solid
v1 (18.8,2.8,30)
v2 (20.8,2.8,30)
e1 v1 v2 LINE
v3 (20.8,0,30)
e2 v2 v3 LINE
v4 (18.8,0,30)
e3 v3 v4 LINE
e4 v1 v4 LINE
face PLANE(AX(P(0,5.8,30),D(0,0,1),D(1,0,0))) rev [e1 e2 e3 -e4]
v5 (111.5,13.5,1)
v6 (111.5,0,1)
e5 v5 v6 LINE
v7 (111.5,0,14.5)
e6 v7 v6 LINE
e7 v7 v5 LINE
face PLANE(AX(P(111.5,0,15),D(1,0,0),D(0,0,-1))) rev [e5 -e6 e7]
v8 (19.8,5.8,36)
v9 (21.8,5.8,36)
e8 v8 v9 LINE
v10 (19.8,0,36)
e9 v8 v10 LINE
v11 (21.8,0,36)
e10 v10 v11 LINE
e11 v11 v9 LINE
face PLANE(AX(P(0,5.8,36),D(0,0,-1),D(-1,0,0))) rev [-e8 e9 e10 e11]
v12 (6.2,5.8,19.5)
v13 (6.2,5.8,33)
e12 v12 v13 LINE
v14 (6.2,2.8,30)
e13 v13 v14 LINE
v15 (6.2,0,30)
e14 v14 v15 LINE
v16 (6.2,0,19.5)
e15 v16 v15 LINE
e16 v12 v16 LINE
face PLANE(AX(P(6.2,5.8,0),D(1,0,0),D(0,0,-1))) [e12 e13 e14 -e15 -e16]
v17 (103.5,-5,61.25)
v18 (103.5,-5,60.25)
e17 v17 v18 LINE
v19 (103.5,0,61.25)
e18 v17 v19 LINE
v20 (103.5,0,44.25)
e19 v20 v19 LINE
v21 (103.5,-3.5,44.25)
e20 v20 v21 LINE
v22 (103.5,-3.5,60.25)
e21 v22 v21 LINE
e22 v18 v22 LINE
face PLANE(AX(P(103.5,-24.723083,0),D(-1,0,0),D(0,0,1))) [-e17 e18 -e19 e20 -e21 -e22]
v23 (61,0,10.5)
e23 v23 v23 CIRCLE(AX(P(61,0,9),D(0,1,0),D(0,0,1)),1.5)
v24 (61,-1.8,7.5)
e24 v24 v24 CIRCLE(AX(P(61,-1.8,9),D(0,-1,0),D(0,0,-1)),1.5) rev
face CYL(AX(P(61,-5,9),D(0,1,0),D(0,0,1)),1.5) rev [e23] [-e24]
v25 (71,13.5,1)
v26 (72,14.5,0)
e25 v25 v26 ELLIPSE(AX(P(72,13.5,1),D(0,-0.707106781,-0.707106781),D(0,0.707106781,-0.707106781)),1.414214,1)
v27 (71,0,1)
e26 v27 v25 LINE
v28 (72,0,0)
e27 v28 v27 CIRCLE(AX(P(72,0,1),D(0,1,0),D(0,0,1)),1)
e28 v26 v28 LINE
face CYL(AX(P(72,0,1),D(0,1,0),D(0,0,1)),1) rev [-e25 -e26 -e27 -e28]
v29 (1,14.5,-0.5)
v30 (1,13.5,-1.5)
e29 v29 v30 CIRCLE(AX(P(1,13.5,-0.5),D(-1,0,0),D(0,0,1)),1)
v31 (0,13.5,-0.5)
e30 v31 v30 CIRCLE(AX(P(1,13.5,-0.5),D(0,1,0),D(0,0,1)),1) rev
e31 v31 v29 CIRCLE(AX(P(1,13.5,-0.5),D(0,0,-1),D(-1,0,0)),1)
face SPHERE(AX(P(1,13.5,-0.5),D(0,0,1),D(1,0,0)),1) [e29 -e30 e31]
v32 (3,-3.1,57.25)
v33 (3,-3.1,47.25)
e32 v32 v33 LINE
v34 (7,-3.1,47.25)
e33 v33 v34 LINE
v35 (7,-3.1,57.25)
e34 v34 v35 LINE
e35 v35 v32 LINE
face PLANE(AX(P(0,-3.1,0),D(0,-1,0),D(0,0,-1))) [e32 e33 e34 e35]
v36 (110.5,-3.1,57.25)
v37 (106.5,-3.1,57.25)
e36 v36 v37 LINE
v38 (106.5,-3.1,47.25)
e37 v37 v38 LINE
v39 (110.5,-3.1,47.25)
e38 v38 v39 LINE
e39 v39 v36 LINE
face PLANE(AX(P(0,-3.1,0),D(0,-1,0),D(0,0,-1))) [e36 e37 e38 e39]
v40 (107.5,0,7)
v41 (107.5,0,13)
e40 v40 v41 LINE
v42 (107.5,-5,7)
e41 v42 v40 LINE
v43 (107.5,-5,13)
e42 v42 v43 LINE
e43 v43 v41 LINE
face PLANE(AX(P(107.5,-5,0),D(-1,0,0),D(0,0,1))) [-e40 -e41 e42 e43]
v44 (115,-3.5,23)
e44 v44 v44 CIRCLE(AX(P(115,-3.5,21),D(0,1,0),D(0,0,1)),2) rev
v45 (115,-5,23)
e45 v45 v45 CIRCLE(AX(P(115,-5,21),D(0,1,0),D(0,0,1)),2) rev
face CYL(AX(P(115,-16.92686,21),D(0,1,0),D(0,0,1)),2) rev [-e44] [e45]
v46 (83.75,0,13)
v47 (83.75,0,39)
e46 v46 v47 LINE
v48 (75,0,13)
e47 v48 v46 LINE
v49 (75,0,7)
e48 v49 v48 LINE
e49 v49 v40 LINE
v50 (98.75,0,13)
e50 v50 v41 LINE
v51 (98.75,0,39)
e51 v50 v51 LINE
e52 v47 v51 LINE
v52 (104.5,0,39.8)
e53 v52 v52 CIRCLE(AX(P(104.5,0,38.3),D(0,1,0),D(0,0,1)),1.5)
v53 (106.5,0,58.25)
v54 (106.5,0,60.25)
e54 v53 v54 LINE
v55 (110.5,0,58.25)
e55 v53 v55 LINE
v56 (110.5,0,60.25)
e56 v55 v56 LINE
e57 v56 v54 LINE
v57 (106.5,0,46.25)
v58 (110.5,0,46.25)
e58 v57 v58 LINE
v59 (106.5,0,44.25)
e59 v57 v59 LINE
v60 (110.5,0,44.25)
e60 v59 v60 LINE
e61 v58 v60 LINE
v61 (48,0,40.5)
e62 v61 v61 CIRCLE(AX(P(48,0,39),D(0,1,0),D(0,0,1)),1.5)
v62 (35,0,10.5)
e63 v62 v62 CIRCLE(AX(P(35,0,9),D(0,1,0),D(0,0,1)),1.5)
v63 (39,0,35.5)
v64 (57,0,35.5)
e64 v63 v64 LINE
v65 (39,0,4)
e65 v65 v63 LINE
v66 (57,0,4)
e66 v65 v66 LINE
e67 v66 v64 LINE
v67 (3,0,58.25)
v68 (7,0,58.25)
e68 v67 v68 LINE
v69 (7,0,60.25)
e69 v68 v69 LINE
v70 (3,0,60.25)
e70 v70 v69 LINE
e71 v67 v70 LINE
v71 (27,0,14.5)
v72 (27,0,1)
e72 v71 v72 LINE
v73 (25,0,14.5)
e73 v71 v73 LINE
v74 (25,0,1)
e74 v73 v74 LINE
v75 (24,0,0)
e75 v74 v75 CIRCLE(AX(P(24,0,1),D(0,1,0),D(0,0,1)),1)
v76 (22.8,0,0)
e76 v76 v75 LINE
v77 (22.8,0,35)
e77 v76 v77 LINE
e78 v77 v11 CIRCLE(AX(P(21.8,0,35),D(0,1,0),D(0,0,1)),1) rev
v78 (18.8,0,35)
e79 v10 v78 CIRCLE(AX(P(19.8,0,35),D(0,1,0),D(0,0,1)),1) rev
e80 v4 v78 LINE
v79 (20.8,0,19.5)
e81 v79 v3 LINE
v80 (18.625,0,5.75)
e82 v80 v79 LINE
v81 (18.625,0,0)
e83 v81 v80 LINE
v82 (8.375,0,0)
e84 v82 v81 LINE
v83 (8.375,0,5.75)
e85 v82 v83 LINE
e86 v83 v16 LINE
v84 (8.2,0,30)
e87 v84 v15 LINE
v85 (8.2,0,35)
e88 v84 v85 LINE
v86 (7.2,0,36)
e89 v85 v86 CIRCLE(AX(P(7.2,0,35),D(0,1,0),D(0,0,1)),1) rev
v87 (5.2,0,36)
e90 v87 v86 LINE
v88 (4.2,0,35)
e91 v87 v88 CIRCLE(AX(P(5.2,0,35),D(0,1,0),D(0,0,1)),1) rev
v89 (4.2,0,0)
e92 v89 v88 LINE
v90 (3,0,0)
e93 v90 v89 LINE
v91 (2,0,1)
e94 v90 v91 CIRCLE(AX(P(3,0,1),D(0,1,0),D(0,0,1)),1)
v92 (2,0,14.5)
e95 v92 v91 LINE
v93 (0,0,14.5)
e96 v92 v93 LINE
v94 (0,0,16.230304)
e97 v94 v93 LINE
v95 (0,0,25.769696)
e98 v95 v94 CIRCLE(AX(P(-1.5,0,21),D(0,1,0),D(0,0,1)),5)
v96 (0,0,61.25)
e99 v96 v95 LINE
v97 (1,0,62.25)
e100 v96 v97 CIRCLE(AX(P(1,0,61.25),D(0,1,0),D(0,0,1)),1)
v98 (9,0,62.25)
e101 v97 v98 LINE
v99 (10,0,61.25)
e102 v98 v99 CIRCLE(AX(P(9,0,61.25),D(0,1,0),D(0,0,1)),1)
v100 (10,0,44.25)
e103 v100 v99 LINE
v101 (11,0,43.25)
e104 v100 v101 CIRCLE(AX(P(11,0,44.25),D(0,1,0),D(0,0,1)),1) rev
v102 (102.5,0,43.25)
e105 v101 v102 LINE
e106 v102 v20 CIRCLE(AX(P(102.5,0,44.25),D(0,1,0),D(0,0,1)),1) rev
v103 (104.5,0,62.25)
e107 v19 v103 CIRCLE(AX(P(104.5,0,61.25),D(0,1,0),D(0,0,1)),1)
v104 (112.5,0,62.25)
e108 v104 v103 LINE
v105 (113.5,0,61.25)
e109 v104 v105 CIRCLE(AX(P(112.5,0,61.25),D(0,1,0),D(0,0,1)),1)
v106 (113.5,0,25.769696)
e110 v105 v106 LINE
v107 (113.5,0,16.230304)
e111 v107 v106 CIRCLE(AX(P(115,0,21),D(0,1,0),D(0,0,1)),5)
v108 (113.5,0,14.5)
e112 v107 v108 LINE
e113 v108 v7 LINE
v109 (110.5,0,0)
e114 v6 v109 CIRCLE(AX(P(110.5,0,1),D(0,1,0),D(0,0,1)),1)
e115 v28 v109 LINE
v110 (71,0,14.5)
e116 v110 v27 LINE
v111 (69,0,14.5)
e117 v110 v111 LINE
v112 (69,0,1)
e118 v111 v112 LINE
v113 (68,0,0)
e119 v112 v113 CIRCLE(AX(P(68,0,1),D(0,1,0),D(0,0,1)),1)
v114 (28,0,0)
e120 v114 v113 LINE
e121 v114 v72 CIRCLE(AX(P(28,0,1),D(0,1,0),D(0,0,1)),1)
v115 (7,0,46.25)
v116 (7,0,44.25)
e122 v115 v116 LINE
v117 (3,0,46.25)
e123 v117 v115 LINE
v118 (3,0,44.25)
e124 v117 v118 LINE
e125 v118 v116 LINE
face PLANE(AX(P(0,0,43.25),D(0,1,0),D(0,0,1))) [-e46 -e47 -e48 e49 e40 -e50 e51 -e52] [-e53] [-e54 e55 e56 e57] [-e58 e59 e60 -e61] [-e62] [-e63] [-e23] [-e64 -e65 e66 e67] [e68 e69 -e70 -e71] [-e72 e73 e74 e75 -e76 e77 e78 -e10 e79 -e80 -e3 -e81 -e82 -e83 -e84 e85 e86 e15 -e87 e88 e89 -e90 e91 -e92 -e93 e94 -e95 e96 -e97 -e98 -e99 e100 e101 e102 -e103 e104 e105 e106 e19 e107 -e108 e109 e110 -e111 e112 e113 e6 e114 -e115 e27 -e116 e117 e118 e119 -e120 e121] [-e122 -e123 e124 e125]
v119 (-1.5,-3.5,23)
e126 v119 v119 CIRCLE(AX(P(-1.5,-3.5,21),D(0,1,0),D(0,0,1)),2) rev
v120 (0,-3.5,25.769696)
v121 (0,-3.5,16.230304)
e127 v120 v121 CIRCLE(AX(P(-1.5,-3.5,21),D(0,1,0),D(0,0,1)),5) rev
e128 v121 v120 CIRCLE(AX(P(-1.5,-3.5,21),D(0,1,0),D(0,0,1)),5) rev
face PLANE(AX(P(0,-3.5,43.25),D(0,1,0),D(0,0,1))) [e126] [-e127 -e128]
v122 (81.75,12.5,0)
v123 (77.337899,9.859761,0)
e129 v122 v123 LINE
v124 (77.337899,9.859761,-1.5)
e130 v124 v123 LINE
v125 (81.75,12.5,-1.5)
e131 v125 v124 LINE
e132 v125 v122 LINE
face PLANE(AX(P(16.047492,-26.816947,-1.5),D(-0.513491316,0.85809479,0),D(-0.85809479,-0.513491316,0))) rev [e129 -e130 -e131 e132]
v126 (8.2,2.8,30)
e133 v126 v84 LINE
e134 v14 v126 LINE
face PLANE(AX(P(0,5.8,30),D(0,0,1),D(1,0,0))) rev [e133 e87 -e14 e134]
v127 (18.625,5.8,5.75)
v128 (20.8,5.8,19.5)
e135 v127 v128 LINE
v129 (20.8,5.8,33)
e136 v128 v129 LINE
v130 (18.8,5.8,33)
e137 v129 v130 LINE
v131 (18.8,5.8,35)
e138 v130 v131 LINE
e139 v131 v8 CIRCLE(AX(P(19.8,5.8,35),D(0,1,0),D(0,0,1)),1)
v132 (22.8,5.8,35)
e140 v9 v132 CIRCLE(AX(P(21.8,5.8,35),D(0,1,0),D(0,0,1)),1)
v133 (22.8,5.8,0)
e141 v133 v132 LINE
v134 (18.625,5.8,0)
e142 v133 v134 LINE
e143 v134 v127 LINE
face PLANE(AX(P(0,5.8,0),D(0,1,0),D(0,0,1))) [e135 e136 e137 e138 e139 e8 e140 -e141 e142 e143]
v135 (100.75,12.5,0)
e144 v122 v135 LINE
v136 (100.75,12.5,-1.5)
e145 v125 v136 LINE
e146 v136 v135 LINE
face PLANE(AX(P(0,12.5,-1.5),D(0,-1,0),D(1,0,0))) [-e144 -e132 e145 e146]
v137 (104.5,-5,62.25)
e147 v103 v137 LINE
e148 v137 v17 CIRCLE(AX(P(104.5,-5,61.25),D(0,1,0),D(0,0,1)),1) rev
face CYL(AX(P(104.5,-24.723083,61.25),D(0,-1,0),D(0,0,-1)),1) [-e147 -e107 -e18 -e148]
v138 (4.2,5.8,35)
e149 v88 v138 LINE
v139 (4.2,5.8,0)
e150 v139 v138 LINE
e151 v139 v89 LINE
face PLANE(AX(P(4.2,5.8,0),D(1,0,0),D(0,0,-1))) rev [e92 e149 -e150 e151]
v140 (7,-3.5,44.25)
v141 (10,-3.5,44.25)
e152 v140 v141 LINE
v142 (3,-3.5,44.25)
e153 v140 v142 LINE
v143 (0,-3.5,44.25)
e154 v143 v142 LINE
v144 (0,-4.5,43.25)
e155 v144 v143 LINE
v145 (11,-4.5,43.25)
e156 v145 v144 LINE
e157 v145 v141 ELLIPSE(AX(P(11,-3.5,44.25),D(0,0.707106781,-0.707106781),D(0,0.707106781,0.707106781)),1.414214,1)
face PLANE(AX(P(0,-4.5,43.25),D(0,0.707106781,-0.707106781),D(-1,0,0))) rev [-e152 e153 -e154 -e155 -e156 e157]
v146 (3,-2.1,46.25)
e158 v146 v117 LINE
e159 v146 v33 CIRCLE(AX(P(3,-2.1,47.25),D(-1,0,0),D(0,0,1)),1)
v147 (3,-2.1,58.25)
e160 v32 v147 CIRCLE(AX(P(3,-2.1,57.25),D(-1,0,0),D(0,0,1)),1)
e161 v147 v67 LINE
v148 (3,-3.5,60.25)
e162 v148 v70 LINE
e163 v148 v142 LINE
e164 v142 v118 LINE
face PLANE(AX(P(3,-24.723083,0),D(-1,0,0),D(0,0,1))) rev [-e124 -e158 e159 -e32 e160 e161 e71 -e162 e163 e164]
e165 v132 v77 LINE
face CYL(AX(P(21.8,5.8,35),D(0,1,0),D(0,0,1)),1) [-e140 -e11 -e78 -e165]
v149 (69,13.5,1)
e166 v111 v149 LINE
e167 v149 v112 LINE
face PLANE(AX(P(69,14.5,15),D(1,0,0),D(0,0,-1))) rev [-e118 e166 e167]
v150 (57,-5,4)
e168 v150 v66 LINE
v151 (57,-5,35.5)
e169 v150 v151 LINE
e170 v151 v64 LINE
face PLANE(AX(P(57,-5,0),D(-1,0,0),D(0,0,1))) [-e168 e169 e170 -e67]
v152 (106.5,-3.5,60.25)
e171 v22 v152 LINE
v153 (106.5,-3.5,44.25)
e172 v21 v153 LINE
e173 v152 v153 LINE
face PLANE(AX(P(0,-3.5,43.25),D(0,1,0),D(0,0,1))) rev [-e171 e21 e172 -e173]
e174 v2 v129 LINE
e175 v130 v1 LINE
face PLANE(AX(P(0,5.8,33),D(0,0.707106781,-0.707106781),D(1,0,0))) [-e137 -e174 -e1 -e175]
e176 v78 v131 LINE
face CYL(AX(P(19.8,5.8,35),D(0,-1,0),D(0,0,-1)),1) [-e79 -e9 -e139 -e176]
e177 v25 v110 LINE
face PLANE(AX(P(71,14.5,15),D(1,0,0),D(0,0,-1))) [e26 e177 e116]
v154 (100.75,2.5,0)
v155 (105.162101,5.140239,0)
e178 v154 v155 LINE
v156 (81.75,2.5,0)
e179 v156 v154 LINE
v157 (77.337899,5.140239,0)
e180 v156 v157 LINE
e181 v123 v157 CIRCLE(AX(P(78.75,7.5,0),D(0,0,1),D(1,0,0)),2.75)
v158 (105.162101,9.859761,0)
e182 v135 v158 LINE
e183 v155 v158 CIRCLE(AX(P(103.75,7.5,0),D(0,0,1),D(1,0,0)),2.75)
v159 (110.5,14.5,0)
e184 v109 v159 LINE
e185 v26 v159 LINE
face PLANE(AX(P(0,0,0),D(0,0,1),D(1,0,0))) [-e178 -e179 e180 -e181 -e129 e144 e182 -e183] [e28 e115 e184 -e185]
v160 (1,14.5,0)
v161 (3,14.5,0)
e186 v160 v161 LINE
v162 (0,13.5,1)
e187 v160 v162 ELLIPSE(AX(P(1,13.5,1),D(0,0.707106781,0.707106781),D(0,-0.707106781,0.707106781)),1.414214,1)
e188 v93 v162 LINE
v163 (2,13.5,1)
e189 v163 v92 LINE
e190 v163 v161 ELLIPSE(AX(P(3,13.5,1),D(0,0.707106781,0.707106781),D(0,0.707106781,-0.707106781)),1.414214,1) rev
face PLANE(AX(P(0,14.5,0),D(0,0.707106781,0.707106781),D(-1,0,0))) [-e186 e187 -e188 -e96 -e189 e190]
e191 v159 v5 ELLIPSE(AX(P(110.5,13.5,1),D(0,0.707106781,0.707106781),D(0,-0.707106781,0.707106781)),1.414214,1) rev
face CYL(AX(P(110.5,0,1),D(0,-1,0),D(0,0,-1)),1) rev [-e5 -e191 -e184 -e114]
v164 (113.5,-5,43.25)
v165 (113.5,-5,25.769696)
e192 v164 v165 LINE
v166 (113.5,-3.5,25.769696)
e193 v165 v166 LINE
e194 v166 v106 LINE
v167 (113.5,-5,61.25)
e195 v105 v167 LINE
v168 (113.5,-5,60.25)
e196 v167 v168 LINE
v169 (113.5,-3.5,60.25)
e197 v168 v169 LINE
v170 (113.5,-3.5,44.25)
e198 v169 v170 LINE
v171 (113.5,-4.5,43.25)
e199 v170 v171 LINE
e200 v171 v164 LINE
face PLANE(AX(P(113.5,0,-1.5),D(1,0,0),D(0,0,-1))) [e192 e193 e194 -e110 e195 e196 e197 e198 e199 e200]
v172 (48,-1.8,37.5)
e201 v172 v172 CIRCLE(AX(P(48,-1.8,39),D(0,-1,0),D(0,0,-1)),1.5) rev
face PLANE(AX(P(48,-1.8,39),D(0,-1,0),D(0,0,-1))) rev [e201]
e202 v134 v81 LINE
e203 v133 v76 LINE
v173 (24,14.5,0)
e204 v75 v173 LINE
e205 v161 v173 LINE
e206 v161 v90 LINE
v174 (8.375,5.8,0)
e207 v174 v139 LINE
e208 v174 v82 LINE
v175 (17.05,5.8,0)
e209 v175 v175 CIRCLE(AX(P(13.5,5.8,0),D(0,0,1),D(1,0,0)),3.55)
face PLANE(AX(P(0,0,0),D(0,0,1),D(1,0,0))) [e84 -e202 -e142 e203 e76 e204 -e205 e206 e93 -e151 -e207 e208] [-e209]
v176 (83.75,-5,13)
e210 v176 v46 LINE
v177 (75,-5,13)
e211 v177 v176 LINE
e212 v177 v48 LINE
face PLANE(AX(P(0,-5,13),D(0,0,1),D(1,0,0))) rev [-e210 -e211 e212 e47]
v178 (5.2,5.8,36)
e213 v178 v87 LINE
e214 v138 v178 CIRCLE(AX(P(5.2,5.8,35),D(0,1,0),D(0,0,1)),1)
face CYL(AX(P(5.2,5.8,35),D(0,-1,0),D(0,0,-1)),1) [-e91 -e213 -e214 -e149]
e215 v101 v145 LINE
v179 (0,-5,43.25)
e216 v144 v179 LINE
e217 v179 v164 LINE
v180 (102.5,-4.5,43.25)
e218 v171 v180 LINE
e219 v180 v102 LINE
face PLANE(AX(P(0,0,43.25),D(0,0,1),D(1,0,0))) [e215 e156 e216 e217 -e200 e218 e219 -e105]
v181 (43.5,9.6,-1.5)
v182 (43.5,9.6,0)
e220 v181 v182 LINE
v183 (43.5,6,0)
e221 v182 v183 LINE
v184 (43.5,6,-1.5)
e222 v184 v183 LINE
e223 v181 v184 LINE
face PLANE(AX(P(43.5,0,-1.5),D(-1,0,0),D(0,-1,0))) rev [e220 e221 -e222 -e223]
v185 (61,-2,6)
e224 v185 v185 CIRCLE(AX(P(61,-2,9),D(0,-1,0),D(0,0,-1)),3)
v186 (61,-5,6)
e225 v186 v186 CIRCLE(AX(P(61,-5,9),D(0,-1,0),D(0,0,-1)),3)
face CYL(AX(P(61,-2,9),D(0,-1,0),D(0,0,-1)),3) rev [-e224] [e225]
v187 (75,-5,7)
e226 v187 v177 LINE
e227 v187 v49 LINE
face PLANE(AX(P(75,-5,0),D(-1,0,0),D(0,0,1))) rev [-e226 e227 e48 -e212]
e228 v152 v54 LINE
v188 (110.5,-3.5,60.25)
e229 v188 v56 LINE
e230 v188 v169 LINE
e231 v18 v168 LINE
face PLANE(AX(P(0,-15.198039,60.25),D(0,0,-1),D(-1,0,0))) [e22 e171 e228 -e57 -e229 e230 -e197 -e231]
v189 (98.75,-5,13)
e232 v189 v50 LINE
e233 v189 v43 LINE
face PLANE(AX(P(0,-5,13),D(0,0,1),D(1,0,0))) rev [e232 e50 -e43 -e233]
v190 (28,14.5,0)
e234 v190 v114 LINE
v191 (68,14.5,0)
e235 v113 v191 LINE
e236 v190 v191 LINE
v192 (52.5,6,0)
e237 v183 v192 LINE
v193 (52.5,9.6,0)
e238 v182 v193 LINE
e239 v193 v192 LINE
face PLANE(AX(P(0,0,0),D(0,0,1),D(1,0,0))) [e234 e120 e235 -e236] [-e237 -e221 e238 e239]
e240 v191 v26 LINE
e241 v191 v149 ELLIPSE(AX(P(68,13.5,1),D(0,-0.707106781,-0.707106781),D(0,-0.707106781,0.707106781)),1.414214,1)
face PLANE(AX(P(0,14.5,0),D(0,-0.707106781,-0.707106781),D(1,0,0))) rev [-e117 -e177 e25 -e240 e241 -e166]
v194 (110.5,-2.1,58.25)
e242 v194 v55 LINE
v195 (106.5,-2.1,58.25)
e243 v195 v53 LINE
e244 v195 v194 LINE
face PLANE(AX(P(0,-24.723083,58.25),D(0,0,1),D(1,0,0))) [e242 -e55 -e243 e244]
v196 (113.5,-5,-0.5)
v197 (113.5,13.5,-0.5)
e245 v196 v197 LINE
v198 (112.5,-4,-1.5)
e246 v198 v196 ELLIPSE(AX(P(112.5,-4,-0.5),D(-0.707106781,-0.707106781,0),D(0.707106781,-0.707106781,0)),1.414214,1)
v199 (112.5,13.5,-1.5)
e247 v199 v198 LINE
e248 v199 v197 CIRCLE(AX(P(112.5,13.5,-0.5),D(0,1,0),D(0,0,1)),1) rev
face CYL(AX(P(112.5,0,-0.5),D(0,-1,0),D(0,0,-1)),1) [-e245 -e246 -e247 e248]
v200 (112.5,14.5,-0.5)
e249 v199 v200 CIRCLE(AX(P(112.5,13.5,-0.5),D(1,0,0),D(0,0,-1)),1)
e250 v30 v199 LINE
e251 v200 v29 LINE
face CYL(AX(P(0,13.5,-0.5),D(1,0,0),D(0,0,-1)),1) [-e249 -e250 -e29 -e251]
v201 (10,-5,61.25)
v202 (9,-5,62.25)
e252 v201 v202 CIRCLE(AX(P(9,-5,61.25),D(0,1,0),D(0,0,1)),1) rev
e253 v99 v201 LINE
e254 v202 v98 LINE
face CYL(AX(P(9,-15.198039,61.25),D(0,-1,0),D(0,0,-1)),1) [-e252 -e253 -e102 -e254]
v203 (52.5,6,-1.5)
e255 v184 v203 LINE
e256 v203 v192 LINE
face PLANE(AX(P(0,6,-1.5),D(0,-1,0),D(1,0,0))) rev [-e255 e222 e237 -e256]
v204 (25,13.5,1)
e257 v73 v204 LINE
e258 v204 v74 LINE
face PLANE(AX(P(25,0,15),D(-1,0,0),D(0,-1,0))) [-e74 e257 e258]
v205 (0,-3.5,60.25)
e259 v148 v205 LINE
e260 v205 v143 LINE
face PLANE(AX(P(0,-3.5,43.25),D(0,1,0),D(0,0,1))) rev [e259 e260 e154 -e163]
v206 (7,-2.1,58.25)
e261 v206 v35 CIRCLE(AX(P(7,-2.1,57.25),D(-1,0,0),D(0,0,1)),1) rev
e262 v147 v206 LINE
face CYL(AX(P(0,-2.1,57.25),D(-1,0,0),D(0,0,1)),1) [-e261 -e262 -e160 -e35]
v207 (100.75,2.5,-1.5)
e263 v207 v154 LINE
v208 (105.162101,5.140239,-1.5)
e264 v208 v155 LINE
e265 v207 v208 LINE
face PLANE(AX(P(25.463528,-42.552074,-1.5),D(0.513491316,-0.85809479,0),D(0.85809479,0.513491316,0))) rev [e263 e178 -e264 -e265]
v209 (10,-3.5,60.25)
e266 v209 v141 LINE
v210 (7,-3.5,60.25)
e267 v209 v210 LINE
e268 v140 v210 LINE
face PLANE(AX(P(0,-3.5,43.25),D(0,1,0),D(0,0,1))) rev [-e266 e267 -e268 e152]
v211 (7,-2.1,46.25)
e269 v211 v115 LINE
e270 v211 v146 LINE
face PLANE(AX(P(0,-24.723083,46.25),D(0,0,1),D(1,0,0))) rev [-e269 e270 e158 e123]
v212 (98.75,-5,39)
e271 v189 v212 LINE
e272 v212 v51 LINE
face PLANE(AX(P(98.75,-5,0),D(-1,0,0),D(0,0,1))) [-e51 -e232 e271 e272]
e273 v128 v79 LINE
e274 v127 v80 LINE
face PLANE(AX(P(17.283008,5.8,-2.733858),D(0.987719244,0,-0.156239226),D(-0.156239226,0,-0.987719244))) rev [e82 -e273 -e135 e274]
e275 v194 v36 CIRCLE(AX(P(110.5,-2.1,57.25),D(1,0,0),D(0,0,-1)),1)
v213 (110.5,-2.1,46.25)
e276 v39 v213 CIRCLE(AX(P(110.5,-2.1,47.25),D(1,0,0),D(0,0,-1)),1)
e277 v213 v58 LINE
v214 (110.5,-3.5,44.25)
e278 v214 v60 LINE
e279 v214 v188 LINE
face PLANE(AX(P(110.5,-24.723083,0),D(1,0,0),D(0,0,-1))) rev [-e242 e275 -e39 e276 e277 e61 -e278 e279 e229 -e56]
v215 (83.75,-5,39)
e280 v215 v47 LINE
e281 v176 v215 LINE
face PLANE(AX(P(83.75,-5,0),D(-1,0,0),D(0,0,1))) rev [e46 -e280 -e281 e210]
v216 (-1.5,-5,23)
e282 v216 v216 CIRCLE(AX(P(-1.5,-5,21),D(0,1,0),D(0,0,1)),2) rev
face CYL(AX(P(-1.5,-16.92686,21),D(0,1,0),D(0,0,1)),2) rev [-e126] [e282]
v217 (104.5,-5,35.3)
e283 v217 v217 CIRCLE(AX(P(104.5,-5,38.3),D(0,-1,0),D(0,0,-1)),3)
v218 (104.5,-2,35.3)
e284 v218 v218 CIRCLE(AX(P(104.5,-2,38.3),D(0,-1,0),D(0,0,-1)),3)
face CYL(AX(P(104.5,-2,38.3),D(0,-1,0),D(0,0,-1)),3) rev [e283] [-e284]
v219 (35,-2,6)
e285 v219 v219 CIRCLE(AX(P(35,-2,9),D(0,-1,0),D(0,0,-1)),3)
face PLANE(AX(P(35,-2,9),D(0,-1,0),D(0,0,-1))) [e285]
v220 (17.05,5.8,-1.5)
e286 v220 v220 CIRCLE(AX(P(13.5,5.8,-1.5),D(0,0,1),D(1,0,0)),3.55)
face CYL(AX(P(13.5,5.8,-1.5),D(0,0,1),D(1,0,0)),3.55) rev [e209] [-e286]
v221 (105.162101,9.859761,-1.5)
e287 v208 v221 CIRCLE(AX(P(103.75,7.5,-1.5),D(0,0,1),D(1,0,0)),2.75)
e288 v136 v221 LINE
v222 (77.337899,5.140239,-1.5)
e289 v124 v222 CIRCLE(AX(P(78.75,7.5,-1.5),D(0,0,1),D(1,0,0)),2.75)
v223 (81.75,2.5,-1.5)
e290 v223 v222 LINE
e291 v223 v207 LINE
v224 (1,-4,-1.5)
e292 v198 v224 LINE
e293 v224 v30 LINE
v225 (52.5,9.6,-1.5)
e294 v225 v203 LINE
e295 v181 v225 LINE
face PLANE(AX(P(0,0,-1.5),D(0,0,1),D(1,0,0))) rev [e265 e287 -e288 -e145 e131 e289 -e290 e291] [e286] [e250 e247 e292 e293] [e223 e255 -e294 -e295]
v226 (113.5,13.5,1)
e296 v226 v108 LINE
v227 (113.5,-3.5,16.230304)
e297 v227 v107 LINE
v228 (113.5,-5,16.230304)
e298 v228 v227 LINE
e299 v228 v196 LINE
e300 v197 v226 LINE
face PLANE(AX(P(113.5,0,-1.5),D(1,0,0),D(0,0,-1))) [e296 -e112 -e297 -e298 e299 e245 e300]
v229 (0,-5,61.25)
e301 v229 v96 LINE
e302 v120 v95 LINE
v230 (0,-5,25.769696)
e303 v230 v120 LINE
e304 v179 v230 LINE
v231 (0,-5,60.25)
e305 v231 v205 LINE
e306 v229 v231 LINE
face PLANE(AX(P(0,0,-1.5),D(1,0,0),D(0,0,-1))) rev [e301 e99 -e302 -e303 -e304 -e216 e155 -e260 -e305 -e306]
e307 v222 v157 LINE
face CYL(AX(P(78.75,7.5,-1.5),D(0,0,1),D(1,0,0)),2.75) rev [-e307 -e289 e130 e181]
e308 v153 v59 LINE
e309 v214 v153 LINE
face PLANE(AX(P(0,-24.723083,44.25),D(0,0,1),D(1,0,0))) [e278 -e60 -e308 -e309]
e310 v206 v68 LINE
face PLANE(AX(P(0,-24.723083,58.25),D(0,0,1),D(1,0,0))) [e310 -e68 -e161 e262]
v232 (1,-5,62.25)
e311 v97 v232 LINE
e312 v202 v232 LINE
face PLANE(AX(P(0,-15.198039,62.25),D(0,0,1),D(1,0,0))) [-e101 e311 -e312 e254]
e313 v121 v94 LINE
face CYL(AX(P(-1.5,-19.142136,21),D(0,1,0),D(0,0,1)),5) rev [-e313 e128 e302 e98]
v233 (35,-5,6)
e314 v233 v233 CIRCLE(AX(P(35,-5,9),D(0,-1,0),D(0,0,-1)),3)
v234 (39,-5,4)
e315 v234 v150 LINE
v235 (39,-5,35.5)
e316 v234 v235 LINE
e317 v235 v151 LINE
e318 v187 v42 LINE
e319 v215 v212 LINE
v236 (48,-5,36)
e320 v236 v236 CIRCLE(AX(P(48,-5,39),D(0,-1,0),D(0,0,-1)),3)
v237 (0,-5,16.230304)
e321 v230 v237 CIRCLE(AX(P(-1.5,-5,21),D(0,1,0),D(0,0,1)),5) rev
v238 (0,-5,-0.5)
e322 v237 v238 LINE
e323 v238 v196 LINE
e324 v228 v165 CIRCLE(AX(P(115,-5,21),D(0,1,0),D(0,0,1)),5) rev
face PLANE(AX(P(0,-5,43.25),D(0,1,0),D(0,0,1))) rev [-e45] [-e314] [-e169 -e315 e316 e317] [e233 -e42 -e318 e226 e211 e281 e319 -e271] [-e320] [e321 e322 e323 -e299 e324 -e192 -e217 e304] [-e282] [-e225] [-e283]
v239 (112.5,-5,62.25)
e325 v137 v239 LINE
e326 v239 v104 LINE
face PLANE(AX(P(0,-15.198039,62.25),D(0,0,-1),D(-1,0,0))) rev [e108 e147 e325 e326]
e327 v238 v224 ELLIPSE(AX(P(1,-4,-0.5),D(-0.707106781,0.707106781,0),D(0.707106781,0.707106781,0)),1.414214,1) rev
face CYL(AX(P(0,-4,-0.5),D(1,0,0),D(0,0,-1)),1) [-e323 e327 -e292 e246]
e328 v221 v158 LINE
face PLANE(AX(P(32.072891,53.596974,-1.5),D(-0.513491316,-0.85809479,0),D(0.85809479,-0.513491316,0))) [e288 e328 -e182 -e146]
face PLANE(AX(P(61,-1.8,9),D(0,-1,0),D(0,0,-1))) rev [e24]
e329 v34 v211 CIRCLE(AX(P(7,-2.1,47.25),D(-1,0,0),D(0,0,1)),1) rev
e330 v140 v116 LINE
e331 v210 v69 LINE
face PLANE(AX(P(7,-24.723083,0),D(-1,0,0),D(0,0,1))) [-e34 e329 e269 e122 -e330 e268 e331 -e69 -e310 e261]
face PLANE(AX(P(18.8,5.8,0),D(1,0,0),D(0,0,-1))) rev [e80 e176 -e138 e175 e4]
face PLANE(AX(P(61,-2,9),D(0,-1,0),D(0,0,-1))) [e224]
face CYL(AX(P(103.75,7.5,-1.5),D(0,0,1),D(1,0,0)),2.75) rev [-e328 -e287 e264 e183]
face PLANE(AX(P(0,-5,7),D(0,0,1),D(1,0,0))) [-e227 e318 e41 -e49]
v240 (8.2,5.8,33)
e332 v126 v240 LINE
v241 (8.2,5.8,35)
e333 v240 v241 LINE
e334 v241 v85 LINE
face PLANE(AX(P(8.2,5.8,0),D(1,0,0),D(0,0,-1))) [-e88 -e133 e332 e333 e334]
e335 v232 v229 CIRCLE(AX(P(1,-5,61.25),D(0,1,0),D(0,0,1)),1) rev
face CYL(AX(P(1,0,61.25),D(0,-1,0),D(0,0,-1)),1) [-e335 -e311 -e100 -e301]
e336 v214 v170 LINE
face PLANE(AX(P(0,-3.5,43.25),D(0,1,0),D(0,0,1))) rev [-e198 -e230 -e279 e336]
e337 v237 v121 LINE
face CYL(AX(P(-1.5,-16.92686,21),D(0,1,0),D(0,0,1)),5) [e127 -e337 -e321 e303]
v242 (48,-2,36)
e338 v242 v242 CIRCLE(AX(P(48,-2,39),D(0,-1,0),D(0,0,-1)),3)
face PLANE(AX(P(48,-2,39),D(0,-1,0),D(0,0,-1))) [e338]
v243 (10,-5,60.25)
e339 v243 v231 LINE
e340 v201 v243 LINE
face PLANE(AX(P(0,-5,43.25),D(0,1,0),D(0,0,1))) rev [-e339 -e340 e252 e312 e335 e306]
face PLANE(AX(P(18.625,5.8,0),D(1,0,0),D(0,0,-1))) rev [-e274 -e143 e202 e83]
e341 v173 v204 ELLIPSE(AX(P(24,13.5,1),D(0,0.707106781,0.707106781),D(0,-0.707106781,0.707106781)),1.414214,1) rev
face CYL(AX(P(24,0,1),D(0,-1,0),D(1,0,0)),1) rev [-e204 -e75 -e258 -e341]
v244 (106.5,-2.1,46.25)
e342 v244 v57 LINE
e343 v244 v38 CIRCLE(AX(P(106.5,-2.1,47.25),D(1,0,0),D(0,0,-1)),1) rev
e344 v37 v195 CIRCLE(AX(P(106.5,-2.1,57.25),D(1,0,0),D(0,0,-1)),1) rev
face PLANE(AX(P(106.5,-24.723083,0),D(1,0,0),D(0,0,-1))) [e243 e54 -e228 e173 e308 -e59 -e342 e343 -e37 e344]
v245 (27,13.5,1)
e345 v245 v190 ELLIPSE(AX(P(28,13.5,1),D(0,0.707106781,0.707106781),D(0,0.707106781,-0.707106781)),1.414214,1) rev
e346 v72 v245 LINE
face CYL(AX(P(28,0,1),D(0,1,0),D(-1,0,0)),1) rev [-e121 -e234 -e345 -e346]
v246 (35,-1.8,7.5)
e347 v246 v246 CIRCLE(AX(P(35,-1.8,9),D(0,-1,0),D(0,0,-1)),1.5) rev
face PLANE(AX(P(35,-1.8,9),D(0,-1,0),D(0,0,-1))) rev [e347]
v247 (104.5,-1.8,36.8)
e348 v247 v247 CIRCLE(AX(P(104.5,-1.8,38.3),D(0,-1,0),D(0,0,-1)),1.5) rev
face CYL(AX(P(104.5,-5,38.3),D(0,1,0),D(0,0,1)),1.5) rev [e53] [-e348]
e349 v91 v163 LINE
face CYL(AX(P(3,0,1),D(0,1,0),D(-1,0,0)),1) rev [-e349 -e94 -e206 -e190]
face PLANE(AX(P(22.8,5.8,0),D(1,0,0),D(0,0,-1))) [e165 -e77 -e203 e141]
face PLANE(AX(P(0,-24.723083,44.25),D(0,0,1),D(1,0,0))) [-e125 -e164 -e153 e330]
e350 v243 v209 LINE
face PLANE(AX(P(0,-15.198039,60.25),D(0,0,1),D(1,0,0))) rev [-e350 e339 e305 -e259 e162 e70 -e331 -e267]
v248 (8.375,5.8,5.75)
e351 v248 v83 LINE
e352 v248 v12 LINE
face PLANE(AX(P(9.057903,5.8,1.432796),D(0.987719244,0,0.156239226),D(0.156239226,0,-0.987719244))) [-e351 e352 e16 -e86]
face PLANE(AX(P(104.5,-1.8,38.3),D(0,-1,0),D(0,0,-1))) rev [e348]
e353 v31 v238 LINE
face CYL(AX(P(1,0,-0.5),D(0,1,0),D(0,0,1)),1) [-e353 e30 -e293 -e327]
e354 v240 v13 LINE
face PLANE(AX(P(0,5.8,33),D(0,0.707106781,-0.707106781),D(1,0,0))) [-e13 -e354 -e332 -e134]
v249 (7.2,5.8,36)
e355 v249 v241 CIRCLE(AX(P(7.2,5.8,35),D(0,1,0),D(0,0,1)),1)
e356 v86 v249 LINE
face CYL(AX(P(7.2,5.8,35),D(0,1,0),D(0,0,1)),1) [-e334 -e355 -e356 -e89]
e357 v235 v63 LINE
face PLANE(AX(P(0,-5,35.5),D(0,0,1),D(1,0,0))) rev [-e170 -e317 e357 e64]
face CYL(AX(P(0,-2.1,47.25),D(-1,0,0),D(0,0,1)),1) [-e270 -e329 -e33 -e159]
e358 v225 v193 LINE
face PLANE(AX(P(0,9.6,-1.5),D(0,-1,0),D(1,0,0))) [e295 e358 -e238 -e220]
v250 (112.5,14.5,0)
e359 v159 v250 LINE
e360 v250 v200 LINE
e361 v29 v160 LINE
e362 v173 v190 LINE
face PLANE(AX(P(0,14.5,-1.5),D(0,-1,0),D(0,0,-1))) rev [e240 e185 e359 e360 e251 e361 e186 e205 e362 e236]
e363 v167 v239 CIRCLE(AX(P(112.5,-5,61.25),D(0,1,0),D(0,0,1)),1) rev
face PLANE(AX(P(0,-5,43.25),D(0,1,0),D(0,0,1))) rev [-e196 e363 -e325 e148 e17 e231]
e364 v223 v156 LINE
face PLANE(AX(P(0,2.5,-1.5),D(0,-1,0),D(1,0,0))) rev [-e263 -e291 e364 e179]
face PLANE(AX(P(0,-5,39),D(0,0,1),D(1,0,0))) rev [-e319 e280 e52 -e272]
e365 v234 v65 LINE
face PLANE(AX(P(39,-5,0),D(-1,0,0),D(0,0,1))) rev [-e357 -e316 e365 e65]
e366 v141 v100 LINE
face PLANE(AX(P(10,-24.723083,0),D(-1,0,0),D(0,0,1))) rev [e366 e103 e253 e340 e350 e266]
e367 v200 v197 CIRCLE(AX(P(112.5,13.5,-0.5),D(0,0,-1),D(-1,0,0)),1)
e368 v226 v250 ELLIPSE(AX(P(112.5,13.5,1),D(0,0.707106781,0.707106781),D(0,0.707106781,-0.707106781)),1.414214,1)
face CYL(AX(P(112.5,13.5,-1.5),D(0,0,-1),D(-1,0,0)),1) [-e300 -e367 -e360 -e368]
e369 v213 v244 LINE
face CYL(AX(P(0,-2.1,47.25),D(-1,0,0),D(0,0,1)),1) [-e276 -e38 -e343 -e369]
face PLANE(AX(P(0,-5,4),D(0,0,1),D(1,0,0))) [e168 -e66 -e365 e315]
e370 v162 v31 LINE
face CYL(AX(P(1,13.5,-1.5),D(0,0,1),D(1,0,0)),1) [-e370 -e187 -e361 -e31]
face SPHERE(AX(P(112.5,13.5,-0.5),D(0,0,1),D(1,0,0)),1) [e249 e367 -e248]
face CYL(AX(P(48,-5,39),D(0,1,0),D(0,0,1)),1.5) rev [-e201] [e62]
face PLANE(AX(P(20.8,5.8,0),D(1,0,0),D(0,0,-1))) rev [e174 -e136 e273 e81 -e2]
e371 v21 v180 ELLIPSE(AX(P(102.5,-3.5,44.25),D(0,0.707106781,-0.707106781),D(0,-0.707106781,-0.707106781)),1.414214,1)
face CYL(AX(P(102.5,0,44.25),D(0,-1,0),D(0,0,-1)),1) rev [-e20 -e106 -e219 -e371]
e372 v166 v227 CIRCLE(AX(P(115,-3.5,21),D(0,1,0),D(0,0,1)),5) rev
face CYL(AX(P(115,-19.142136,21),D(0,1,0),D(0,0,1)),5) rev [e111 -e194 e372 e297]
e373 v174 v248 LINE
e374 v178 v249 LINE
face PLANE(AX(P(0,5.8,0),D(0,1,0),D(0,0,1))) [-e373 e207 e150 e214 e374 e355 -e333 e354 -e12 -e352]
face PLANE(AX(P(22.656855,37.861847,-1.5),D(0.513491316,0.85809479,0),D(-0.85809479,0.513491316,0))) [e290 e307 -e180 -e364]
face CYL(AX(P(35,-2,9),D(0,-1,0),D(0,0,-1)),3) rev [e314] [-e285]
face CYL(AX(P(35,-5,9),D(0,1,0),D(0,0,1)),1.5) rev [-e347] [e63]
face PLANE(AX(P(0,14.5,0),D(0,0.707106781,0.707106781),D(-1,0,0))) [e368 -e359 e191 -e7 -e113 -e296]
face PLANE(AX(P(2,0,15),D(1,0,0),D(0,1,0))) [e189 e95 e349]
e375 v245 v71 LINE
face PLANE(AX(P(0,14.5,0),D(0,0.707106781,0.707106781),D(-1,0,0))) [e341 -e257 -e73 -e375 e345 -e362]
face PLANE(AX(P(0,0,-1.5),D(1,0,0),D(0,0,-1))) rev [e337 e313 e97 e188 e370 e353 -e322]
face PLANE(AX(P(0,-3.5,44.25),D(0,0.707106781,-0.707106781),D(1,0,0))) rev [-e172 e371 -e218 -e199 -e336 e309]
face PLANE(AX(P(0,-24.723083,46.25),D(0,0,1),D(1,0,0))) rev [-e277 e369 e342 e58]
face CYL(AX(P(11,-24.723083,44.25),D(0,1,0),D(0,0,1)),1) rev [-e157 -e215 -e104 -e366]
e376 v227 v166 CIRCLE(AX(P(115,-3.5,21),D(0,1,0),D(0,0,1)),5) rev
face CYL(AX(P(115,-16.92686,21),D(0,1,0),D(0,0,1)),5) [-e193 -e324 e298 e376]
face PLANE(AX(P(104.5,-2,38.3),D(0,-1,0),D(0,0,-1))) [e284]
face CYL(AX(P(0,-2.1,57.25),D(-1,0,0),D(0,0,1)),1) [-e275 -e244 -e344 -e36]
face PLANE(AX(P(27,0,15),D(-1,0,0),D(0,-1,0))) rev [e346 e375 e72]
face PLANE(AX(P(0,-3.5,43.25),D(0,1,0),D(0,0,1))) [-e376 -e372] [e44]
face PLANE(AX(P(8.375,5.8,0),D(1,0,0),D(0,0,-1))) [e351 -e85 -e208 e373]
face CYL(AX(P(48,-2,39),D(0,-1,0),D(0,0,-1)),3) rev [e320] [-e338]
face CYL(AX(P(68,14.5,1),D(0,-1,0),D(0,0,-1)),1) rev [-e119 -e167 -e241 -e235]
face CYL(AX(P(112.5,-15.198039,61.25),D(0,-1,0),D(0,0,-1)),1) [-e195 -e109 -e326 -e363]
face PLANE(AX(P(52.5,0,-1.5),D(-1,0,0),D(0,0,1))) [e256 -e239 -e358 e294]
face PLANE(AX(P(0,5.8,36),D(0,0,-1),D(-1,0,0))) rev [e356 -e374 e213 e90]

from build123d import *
from build123d.topology import SkipClean

# Parameters (mm, degrees)
SKETCH1_W                = 113.5
SKETCH1_H                = 14.5
SKETCH1_W_2              = 9
SKETCH1_H_2              = 3.6
SKETCH1_R                = 3.55
BOSS_EXTRUDE1_DEPTH      = 1.5
BOSS_EXTRUDE2_DEPTH      = 43.25
BOSS_EXTRUDE2_DEPTH_BACK = 1.5
SKETCH1_4_W              = 113.5
SKETCH1_4_H              = 5
SKETCH2_R                = 1.5
SKETCH2_W                = 18
SKETCH2_H                = 31.5
CUT_EXTRUDE1_DEPTH       = 123.323597478
BOSS_EXTRUDE3_DEPTH      = 5
SKETCH2_4_R              = 5
CUT_EXTRUDE2_DEPTH       = 3.5
CUT_EXTRUDE3_DEPTH       = 129.377616819
SKETCH1_5_W              = 2
SKETCH1_5_H              = 14.5
BOSS_EXTRUDE4_DEPTH      = 15
CHAMFER1_SIZE            = 15
BOSS_EXTRUDE5_DEPTH      = 5.8
BOSS_EXTRUDE6_DEPTH      = 3.5
BOSS_EXTRUDE7_DEPTH      = 5
SKETCH5_W                = 4
SKETCH5_H                = 12
CUT_EXTRUDE4_DEPTH       = 0.4
CHAMFER2_SIZE            = 1
CHAMFER3_SIZE            = 3
SKETCH6_R                = 3
CUT_EXTRUDE6_DEPTH       = 3
SKETCH7_R                = 2.883659138
SKETCH7_R_2              = 3
BOSS_EXTRUDE8_DEPTH      = 0.2
FILLET1_R                = 1


# Some blends are built 0.0001 mm under size
with BuildPart() as part:
    # Sketch1 → Boss-Extrude1 (new body)
    with BuildSketch(Plane.XY):
        with Locations((56.75, 7.25)):
            Rectangle(SKETCH1_W, SKETCH1_H)
        with Locations((48, 7.8)):
            Rectangle(SKETCH1_W_2, SKETCH1_H_2, mode=Mode.SUBTRACT)
        with Locations((13.5, 5.8)):
            Circle(SKETCH1_R, mode=Mode.SUBTRACT)
        with BuildLine():
            ThreePointArc((77.33789888, 5.140239328), (76, 7.5), (77.33789888, 9.859760672))
            Line((77.33789888, 9.859760672), (81.75, 12.5))
            Line((81.75, 12.5), (100.75, 12.5))
            Line((100.75, 12.5), (105.16210112, 9.859760672))
            ThreePointArc((105.16210112, 9.859760672), (106.5, 7.5), (105.16210112, 5.140239328))
            Line((105.16210112, 5.140239328), (100.75, 2.5))
            Line((100.75, 2.5), (81.75, 2.5))
            Line((81.75, 2.5), (77.33789888, 5.140239328))
        make_face(mode=Mode.SUBTRACT)
    extrude(amount=-BOSS_EXTRUDE1_DEPTH)

    # Sketch1<4> → Boss-Extrude2 (add, two sides: drawn at the far end of the back side and taken through both)
    with BuildSketch(Plane.XY.offset(-BOSS_EXTRUDE2_DEPTH_BACK)):
        with Locations((56.75, -2.5)):
            Rectangle(SKETCH1_4_W, SKETCH1_4_H)
    extrude(amount=BOSS_EXTRUDE2_DEPTH + BOSS_EXTRUDE2_DEPTH_BACK)

    # Sketch2 → Cut-Extrude1 (cut, through all)
    with BuildSketch(Plane(origin=(0, 0, 0), x_dir=(1, 0, 0), z_dir=(0, 1, 0))):
        with Locations(Location((35, -9, 0), (0, 0, 270))):
            Circle(SKETCH2_R)
        with Locations(Location((61, -9, 0), (0, 0, 270))):
            Circle(SKETCH2_R)
        with Locations((48, -19.75)):
            Rectangle(SKETCH2_W, SKETCH2_H)
        Polygon((75, -7), (75, -13), (83.75, -13), (83.75, -39), (98.75, -39), (98.75, -13), (107.5, -13), (107.5, -7), align=None)
        with Locations(Location((48, -39, 0), (0, 0, 270))):
            Circle(SKETCH2_R)
        with Locations(Location((104.5, -38.3, 0), (0, 0, 270))):
            Circle(SKETCH2_R)
    extrude(amount=-CUT_EXTRUDE1_DEPTH, mode=Mode.SUBTRACT)

    # Sketch2<3> → Boss-Extrude3 (add)
    with BuildSketch(Plane(origin=(0, 0, 0), x_dir=(1, 0, 0), z_dir=(0, 1, 0))):
        with BuildLine():
            Line((0, -19.677124344), (0, -16.230303993))
            ThreePointArc((0, -16.230303993), (-6.5, -21), (0, -25.769696007))
            Line((0, -25.769696007), (0, -22.322875656))
            ThreePointArc((0, -22.322875656), (-3.5, -21), (0, -19.677124344))
        make_face()
        with BuildLine():
            ThreePointArc((120, -21), (117.958039892, -16.968871126), (113.5, -16.230303993))
            Line((113.5, -16.230303993), (113.5, -19.677124344))
            ThreePointArc((113.5, -19.677124344), (115.707106781, -19.129171307), (117, -21))
            ThreePointArc((117, -21), (115.707106781, -22.870828693), (113.5, -22.322875656))
            Line((113.5, -22.322875656), (113.5, -25.769696007))
            ThreePointArc((113.5, -25.769696007), (117.958039892, -25.031128874), (120, -21))
        make_face()
    extrude(amount=-BOSS_EXTRUDE3_DEPTH)

    # Sketch2<4> → Cut-Extrude2 (cut)
    with BuildSketch(Plane(origin=(0, 0, 0), x_dir=(1, 0, 0), z_dir=(0, 1, 0))):
        with Locations((115, -21)):
            Circle(SKETCH2_4_R)
        with Locations((-1.5, -21)):
            Circle(SKETCH2_4_R)
    extrude(amount=-CUT_EXTRUDE2_DEPTH, mode=Mode.SUBTRACT)

    # Sketch2<5> → Cut-Extrude3 (cut, through all)
    with SkipClean():  # the faces are left unmerged after this step: merging them gives an invalid solid
        with BuildSketch(Plane(origin=(0, 0, 0), x_dir=(1, 0, 0), z_dir=(0, 1, 0))):
            with BuildLine():
                ThreePointArc((0, -22.322875656), (0.370828693, -21.707106781), (0.5, -21))
                Line((0.5, -21), (0, -21))
                Line((0, -21), (0, -22.322875656))
            make_face()
            with BuildLine():
                Line((0, -21), (0.5, -21))
                ThreePointArc((0.5, -21), (0.370828693, -20.292893219), (0, -19.677124344))
                Line((0, -19.677124344), (0, -21))
            make_face()
            with BuildLine():
                Line((0, -22.322875656), (0, -21))
                Line((0, -21), (0, -19.677124344))
                ThreePointArc((0, -19.677124344), (-3.5, -21), (0, -22.322875656))
            make_face()
            with BuildLine():
                ThreePointArc((113.5, -19.677124344), (113.129171307, -20.292893219), (113, -21))
                Line((113, -21), (113.5, -21))
                Line((113.5, -21), (113.5, -19.677124344))
            make_face()
            with BuildLine():
                Line((113.5, -21), (113, -21))
                ThreePointArc((113, -21), (113.129171307, -21.707106781), (113.5, -22.322875656))
                Line((113.5, -22.322875656), (113.5, -21))
            make_face()
            with BuildLine():
                Line((113.5, -19.677124344), (113.5, -21))
                Line((113.5, -21), (113.5, -22.322875656))
                ThreePointArc((113.5, -22.322875656), (115.707106781, -22.870828693), (117, -21))
                ThreePointArc((117, -21), (115.707106781, -19.129171307), (113.5, -19.677124344))
            make_face()
        extrude(amount=-CUT_EXTRUDE3_DEPTH, mode=Mode.SUBTRACT)

    # Sketch1<5> → Boss-Extrude4 (add)
    with SkipClean():  # the faces are left unmerged after this step: merging them gives an invalid solid
        with BuildSketch(Plane.XY):
            with Locations((1, 7.25)):
                Rectangle(SKETCH1_5_W, SKETCH1_5_H)
            with Locations((112.5, 7.25)):
                Rectangle(SKETCH1_5_W, SKETCH1_5_H)
            with Locations((26, 7.25)):
                Rectangle(SKETCH1_5_W, SKETCH1_5_H)
            with Locations((70, 7.25)):
                Rectangle(SKETCH1_5_W, SKETCH1_5_H)
        extrude(amount=BOSS_EXTRUDE4_DEPTH)

    # Chamfer1
    # the kernel refuses this chamfer: 15 mm, written as the material it takes off along each edge
    with BuildSketch(Plane(origin=(152.075244819, 14.5, 15), x_dir=(0, 0.02749587661058632, -0.9996219169112968), z_dir=(-1, 0, 0))) as chamfer1_piece_1_section:
        Polygon((CHAMFER1_SIZE * 0.999621916911, CHAMFER1_SIZE * 0.0274958766106), (-CHAMFER1_SIZE * 0.0274958766106, CHAMFER1_SIZE * 0.999621916911), (0, 0), align=None)
    chamfer1_piece_1 = extrude(amount=79.150489639, mode=Mode.PRIVATE)
    chamfer1_piece_1 = split(chamfer1_piece_1, bisect_by=Plane(origin=(112.5, 0, 10.024674218), z_dir=(0, 1, 0)), keep=Keep.TOP, mode=Mode.PRIVATE)
    add(chamfer1_piece_1, mode=Mode.SUBTRACT)
    with BuildSketch(Plane(origin=(30.424755181, 14.5, 15), x_dir=(0, 0.02749587661058632, -0.9996219169112968), z_dir=(1, 0, 0))) as chamfer1_piece_2_section:
        Polygon((CHAMFER1_SIZE * 0.999621916911, -CHAMFER1_SIZE * 0.0274958766106), (-CHAMFER1_SIZE * 0.0274958766106, -CHAMFER1_SIZE * 0.999621916911), (0, 0), align=None)
    chamfer1_piece_2 = extrude(amount=79.150489639, mode=Mode.PRIVATE)
    chamfer1_piece_2 = split(chamfer1_piece_2, bisect_by=Plane(origin=(70, 0, 10.024674218), z_dir=(0, 1, 0)), keep=Keep.TOP, mode=Mode.PRIVATE)
    add(chamfer1_piece_2, mode=Mode.SUBTRACT)
    with BuildSketch(Plane(origin=(65.575244819, 14.5, 15), x_dir=(0, 0.02749587661058632, -0.9996219169112968), z_dir=(-1, 0, 0))) as chamfer1_piece_3_section:
        Polygon((CHAMFER1_SIZE * 0.999621916911, CHAMFER1_SIZE * 0.0274958766106), (-CHAMFER1_SIZE * 0.0274958766106, CHAMFER1_SIZE * 0.999621916911), (0, 0), align=None)
    chamfer1_piece_3 = extrude(amount=79.150489639, mode=Mode.PRIVATE)
    chamfer1_piece_3 = split(chamfer1_piece_3, bisect_by=Plane(origin=(26, 0, 10.024674218), z_dir=(0, 1, 0)), keep=Keep.TOP, mode=Mode.PRIVATE)
    add(chamfer1_piece_3, mode=Mode.SUBTRACT)
    with BuildSketch(Plane(origin=(40.575244819, 14.5, 15), x_dir=(0, 0.02749587661058632, -0.9996219169112968), z_dir=(-1, 0, 0))) as chamfer1_piece_4_section:
        Polygon((CHAMFER1_SIZE * 0.999621916911, CHAMFER1_SIZE * 0.0274958766106), (-CHAMFER1_SIZE * 0.0274958766106, CHAMFER1_SIZE * 0.999621916911), (0, 0), align=None)
    chamfer1_piece_4 = extrude(amount=79.150489639, mode=Mode.PRIVATE)
    chamfer1_piece_4 = split(chamfer1_piece_4, bisect_by=Plane(origin=(1, 0, 10.024674218), z_dir=(0, 1, 0)), keep=Keep.TOP, mode=Mode.PRIVATE)
    add(chamfer1_piece_4, mode=Mode.SUBTRACT)

    # Sketch2<6> → Boss-Extrude5 (add)
    with BuildSketch(Plane(origin=(0, 0, 0), x_dir=(1, 0, 0), z_dir=(0, 1, 0))):
        Polygon((18.625, -5.75), (20.8, -19.5), (20.8, -30), (18.8, -30), (18.8, -36), (22.8, -36), (22.8, 0), (18.625, 0), align=None)
        Polygon((8.375, -5.75), (8.375, 0), (4.2, 0), (4.2, -36), (8.2, -36), (8.2, -30), (6.2, -30), (6.2, -19.5), align=None)
    extrude(amount=BOSS_EXTRUDE5_DEPTH)

    # Sketch4 → Boss-Extrude6 (add)
    # profile 1 of 2: a face of its own
    with BuildSketch(Plane(origin=(0, 0, 0), x_dir=(1, 0, 0), z_dir=(0, 1, 0))):
        Polygon((3, -58.25), (5, -58.25), (7, -58.25), (7, -60.25), (10, -60.25), (10, -43.25), (0, -43.25), (0, -60.25), (3, -60.25), align=None)
        Polygon((7, -46.25), (5, -46.25), (3, -46.25), (3, -44.25), (7, -44.25), align=None, mode=Mode.SUBTRACT)
    # profile 2 of 2: a face of its own
    with BuildSketch(Plane(origin=(0, 0, 0), x_dir=(1, 0, 0), z_dir=(0, 1, 0))):
        Polygon((113.5, -60.25), (113.5, -43.25), (103.5, -43.25), (103.5, -60.25), (106.5, -60.25), (106.5, -58.25), (108.5, -58.25), (110.5, -58.25), (110.5, -60.25), align=None)
        Polygon((110.5, -46.25), (108.5, -46.25), (106.5, -46.25), (106.5, -44.25), (110.5, -44.25), align=None, mode=Mode.SUBTRACT)
    extrude(amount=-BOSS_EXTRUDE6_DEPTH)

    # Sketch4<4> → Boss-Extrude7 (add)
    with BuildSketch(Plane(origin=(0, 0, 0), x_dir=(1, 0, 0), z_dir=(0, 1, 0))):
        Polygon((7, -60.25), (3, -60.25), (0, -60.25), (0, -62.25), (10, -62.25), (10, -60.25), align=None)
        Polygon((113.5, -62.25), (113.5, -60.25), (110.5, -60.25), (106.5, -60.25), (103.5, -60.25), (103.5, -62.25), align=None)
    extrude(amount=-BOSS_EXTRUDE7_DEPTH)

    # Sketch5 → Cut-Extrude4 (cut)
    with BuildSketch(Plane.XZ.offset(3.5)):
        with Locations((108.5, 52.25)):
            Rectangle(SKETCH5_W, SKETCH5_H)
        with Locations((5, 52.25)):
            Rectangle(SKETCH5_W, SKETCH5_H)
    extrude(amount=-CUT_EXTRUDE4_DEPTH, mode=Mode.SUBTRACT)

    # Chamfer2
    chamfer2_edges = [part.edges().sort_by_distance(p)[0] for p in [
        (5, -3.5, 43.25),
        (108.5, -3.5, 43.25),
    ]]
    chamfer(chamfer2_edges, length=CHAMFER2_SIZE - 0.0001)  # a hair under: the kernel refuses the full size

    # Chamfer3
    chamfer3_edges = [part.edges().sort_by_distance(p)[0] for p in [
        (7.2, 5.8, 30),
        (19.8, 5.8, 30),
    ]]
    chamfer(chamfer3_edges, length=CHAMFER3_SIZE)

    # Sketch6 → Cut-Extrude6 (cut)
    with BuildSketch(Plane.XZ.offset(5)):
        with Locations(Location((35, 9, 0), (0, 0, 270))):
            Circle(SKETCH6_R)
        with Locations(Location((61, 9, 0), (0, 0, 270))):
            Circle(SKETCH6_R)
        with Locations(Location((48, 39, 0), (0, 0, 270))):
            Circle(SKETCH6_R)
        with Locations(Location((104.5, 38.3, 0), (0, 0, 270))):
            Circle(SKETCH6_R)
    extrude(amount=-CUT_EXTRUDE6_DEPTH, mode=Mode.SUBTRACT)

    # Sketch7 → Boss-Extrude8 (add)
    with BuildSketch(Plane.XZ.offset(2)):
        with Locations((48, 39)):
            Circle(SKETCH7_R)
        with Locations(Location((35, 9, 0), (0, 0, 270))):
            Circle(SKETCH7_R_2)
        with Locations(Location((61, 9, 0), (0, 0, 270))):
            Circle(SKETCH7_R_2)
        with Locations(Location((104.5, 38.3, 0), (0, 0, 270))):
            Circle(SKETCH7_R_2)
    extrude(amount=-BOSS_EXTRUDE8_DEPTH)

    # Fillet1
    fillet1_edges = [part.edges().sort_by_distance(p)[0] for p in [
        (0, 14.5, -0.75),
        (113.5, 14.5, -0.75),
        (111.5, 7.25, 0),
        (69, 7.25, 0),
        (25, 7.25, 0),
        (71, 7.25, 0),
        (27, 7.25, 0),
        (2, 7.25, 0),
        (56.75, -5, -1.5),
        (56.75, 14.5, -1.5),
        (113.5, 4.75, -1.5),
        (0, 4.75, -1.5),
        (103.5, -2.24995, 43.25),
        (103.5, -2.5, 62.25),
        (113.5, -2.5, 62.25),
        (10, -2.24995, 43.25),
        (10, -2.5, 62.25),
        (0, -2.5, 62.25),
        (18.8, 2.9, 36),
        (8.2, 2.9, 36),
        (4.2, 2.9, 36),
        (22.8, 2.9, 36),
        (108.5, -3.1, 58.25),
        (108.5, -3.1, 46.25),
        (5, -3.1, 58.25),
        (5, -3.1, 46.25),
    ]]
    fillet(fillet1_edges, radius=FILLET1_R - 0.0001)  # a hair under: the kernel refuses the full size


solid = part.part
